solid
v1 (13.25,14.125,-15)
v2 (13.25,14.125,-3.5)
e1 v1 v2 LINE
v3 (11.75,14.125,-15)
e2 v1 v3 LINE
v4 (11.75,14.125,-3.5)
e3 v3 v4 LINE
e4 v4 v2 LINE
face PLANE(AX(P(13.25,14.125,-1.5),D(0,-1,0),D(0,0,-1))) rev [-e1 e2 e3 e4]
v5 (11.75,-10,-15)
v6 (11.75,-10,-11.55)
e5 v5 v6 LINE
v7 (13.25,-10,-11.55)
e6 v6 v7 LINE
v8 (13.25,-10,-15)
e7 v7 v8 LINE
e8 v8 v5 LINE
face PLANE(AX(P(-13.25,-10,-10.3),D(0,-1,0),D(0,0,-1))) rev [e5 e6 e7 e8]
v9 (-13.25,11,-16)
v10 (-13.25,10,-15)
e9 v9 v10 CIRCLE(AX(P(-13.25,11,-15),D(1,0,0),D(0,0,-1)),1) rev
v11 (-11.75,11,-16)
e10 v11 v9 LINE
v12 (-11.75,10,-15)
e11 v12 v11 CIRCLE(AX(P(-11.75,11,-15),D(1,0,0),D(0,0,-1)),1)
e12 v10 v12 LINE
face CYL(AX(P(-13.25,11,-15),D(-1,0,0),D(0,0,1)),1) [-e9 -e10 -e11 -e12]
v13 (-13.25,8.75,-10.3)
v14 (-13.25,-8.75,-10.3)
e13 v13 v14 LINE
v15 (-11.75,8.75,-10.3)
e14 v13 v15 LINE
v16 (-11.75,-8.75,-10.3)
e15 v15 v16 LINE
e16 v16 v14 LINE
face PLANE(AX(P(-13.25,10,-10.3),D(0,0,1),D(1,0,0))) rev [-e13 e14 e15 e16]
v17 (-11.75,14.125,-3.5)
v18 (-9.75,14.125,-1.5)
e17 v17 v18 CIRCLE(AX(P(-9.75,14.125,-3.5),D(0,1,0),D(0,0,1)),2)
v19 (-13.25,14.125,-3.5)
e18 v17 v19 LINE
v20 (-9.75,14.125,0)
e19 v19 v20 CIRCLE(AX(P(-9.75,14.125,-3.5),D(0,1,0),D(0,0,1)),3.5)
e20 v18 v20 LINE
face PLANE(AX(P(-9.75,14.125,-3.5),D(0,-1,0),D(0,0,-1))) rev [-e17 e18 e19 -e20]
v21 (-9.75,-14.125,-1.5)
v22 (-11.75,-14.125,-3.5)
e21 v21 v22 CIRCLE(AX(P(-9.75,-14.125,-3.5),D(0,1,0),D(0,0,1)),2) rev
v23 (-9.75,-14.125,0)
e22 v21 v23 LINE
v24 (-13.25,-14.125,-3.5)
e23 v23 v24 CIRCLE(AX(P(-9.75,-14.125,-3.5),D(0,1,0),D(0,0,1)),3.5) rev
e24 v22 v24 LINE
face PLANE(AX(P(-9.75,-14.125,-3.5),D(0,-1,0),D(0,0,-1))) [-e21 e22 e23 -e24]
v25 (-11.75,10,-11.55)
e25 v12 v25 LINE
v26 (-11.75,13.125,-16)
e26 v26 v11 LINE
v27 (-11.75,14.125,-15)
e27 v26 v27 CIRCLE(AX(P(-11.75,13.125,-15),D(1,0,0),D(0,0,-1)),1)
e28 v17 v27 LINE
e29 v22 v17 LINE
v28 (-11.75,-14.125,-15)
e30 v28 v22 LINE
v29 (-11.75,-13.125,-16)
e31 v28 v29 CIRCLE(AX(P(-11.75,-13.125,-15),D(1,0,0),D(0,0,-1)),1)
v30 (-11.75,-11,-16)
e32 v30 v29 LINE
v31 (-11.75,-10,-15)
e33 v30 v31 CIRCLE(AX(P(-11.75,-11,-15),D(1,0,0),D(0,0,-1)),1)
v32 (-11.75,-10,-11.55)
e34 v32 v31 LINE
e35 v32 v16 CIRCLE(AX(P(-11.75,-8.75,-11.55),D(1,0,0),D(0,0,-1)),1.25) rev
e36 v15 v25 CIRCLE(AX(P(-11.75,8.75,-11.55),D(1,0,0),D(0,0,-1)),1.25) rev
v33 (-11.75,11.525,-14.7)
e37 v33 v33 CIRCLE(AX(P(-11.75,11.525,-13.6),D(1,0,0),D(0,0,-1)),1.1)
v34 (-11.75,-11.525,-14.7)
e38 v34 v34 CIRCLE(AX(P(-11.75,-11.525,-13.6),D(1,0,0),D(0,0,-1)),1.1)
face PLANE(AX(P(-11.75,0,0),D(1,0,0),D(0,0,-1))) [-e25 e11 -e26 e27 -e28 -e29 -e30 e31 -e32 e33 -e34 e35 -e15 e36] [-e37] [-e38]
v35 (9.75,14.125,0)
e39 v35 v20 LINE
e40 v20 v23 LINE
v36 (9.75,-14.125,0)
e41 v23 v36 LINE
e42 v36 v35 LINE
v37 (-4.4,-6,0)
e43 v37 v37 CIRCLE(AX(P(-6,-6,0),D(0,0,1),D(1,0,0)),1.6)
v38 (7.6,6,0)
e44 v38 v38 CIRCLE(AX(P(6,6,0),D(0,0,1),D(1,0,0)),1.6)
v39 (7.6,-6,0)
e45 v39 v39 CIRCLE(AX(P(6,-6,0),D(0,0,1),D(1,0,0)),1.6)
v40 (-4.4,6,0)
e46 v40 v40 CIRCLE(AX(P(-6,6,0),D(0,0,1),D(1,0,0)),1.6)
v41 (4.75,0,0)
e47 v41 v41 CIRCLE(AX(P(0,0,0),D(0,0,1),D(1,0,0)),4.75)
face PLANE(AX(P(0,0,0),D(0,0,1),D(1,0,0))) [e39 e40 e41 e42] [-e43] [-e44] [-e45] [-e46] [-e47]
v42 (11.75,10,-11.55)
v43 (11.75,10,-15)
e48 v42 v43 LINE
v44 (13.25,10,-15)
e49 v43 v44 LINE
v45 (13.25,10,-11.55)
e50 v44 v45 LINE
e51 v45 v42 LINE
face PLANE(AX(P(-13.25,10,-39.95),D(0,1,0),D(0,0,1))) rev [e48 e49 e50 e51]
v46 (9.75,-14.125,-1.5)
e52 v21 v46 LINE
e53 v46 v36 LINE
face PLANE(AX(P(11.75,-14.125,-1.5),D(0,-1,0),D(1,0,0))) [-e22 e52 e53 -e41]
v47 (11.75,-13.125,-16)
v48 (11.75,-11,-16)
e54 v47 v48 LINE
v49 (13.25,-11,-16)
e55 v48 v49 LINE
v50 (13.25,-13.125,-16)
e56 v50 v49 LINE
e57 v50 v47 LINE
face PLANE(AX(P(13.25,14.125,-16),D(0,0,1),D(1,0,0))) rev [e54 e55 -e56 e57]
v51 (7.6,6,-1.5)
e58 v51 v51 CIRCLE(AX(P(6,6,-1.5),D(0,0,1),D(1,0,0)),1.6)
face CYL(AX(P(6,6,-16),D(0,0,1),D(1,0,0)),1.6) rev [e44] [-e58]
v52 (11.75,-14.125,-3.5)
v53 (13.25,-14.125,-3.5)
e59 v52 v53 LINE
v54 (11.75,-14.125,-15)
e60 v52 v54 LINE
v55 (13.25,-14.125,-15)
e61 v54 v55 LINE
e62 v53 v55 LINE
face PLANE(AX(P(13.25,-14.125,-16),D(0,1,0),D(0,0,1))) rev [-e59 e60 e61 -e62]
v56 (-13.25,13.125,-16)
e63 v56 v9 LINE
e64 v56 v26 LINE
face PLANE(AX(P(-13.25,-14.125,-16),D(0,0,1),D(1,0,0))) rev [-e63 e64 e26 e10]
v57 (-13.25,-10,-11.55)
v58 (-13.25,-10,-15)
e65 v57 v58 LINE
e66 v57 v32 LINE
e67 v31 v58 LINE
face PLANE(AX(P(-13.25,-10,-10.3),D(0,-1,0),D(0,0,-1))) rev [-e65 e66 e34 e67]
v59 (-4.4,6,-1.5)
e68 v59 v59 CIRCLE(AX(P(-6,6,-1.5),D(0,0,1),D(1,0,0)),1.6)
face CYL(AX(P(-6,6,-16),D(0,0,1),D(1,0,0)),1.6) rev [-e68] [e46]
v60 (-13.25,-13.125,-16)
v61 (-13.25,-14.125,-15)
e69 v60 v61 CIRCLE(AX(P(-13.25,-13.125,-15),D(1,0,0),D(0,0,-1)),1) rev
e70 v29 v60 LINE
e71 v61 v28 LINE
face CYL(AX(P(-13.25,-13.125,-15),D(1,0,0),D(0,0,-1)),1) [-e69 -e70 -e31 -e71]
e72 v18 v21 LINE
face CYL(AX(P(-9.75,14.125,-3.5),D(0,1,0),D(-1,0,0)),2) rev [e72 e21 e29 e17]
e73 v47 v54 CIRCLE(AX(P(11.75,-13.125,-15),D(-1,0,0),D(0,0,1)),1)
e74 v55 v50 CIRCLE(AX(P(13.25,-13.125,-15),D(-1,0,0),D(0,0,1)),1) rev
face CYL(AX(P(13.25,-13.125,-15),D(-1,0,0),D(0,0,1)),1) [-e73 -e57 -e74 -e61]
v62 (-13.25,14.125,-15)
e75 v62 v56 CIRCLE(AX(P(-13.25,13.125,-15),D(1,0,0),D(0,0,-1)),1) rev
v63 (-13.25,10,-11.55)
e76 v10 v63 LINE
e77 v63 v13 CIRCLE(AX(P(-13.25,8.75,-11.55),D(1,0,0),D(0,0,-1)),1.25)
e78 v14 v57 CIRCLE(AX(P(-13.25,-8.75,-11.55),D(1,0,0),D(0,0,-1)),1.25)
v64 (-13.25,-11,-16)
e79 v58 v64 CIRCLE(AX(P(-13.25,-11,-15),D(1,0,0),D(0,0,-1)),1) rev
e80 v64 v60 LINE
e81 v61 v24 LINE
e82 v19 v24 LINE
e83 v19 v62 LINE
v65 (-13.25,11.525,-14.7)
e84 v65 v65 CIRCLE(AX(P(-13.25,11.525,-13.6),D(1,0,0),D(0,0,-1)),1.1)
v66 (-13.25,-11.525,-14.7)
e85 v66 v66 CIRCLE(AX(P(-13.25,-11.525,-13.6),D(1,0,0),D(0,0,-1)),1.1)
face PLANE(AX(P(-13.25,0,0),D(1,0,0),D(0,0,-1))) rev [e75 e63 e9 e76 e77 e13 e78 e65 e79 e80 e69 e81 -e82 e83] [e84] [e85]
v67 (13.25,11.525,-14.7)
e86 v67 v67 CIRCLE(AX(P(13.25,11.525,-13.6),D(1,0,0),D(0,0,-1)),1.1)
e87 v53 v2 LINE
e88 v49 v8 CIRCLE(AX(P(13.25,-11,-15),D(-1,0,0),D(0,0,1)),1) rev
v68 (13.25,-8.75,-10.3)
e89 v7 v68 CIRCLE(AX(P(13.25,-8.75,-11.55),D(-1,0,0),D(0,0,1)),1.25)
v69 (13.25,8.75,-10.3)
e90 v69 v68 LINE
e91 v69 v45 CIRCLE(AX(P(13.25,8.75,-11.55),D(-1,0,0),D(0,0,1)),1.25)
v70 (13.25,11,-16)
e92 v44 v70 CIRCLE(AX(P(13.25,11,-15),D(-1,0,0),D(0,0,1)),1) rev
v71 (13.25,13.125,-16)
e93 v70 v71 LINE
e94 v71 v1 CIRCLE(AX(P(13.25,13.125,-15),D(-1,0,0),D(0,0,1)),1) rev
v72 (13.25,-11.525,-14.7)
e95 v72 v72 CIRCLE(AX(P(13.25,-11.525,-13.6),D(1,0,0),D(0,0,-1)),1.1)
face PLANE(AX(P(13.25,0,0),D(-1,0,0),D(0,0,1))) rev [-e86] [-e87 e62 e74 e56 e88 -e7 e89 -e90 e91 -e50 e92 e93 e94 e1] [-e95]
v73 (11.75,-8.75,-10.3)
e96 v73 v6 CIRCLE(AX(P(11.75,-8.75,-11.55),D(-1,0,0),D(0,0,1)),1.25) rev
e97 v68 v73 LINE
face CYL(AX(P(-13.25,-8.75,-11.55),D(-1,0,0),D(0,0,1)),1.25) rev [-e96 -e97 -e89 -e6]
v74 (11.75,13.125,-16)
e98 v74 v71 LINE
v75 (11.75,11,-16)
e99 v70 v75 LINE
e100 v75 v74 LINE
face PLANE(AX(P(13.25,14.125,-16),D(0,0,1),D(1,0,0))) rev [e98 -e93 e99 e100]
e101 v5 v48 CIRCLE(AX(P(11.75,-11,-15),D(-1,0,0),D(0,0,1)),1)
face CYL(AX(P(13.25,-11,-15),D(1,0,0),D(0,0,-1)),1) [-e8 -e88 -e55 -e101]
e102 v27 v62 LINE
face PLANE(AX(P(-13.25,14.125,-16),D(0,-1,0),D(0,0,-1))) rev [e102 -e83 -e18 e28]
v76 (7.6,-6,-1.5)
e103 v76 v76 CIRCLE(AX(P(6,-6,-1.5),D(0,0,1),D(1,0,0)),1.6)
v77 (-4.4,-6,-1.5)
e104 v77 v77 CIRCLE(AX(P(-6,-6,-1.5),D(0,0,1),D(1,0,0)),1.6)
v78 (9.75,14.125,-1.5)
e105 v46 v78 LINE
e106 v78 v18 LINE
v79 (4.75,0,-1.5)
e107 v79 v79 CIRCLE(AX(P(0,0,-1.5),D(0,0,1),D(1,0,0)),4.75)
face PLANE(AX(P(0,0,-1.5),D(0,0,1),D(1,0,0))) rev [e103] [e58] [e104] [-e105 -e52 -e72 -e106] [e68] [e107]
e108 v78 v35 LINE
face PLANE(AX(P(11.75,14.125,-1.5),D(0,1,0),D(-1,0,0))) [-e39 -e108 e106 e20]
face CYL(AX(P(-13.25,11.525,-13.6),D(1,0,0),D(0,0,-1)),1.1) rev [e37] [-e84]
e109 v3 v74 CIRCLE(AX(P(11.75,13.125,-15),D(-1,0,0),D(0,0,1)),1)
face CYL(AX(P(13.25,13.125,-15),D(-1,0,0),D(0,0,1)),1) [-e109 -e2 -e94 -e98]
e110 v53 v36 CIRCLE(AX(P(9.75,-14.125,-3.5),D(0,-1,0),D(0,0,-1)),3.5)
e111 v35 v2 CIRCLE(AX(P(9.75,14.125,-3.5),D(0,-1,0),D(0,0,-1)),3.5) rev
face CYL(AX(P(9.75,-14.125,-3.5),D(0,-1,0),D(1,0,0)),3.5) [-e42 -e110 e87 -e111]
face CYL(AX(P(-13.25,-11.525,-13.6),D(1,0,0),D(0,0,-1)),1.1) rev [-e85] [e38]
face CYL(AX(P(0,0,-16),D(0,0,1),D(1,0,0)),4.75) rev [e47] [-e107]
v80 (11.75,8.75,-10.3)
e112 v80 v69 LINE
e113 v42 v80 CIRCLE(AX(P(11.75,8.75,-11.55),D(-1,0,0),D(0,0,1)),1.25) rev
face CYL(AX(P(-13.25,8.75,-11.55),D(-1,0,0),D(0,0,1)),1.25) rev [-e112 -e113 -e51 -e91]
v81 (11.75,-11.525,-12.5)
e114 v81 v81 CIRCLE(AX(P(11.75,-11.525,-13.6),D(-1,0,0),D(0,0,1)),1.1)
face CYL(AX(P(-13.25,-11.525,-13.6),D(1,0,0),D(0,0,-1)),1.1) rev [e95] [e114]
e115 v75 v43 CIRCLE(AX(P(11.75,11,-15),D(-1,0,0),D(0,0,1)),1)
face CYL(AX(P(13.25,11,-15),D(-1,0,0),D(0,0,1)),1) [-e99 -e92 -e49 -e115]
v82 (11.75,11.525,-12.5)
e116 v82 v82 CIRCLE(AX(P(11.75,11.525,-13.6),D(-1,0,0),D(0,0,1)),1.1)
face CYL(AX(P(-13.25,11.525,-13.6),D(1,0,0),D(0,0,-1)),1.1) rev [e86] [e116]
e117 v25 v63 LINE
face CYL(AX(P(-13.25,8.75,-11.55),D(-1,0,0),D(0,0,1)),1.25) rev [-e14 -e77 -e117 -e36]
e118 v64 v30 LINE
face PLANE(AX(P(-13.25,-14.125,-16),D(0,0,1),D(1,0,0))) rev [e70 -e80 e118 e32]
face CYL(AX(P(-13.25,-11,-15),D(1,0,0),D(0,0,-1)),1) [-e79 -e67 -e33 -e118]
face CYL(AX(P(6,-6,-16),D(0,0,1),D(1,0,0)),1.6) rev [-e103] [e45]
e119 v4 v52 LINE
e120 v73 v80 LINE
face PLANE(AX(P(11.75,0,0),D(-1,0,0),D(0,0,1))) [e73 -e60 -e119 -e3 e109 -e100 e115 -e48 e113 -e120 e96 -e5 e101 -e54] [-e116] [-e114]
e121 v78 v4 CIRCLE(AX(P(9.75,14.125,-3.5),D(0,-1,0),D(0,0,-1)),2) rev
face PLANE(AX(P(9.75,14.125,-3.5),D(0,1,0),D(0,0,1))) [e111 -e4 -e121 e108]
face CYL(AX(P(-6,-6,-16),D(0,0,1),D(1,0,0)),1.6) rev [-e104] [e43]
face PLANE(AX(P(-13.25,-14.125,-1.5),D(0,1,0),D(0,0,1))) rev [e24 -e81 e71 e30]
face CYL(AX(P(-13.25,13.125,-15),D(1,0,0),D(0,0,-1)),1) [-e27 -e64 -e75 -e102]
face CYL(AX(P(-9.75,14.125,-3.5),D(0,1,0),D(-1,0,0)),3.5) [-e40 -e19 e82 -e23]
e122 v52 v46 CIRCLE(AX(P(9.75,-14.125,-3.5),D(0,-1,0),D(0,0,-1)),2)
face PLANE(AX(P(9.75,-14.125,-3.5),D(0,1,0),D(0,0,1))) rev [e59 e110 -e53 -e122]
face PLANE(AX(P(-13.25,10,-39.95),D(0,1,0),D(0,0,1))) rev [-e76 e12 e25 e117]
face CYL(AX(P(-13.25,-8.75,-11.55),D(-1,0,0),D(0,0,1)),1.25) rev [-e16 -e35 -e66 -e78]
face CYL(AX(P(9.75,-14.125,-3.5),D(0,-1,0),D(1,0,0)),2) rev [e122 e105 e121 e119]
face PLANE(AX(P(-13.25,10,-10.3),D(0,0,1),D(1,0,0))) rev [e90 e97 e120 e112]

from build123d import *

# Parameters (mm, degrees)
SKETCH1_W                      = 23.5
SKETCH1_H                      = 28.25
BASE_FLANGE1_DEPTH             = 1.5
EDGE_FLANGE1_STRIP_W           = 10
EDGE_FLANGE1_STRIP_H           = 1.5
EDGE_FLANGE1_STRIP_CUT_DEPTH   = 28.25
EDGE_FLANGE1_STRIP_2_W         = 10
EDGE_FLANGE1_STRIP_2_H         = 1.5
EDGE_FLANGE1_STRIP_CUT_2_DEPTH = 28.25
EDGE_FLANGE1_DEPTH             = 28.25
EDGE_FLANGE1_BEND_DEPTH        = 28.25
SKETCH12_R                     = 1.6
SKETCH12_R_2                   = 4.75
CUT_EXTRUDE1_DEPTH             = 26.12126838
SKETCH13_R                     = 1.1
SKETCH13_W                     = 29.65
SKETCH13_H                     = 20
CUT_EXTRUDE2_DEPTH             = 35.025955167
FILLET1_R                      = 1.25
FILLET2_R                      = 1


# Sheet-metal steps are written as plain solids
with BuildPart() as part:
    # Sketch1 → Base-Flange1 (new body)
    with BuildSketch(Plane.XY):
        Rectangle(SKETCH1_W, SKETCH1_H)
    extrude(amount=-BASE_FLANGE1_DEPTH)

    # Edge-Flange1 strip (across the edge) → Edge-Flange1 strip cut (cut)
    with BuildSketch(Plane(origin=(11.75, 14.125, -1.5), x_dir=(-1, 0, 0), z_dir=(0, -1, 0))):
        with Locations((-3, -0.75)):
            Rectangle(EDGE_FLANGE1_STRIP_W, EDGE_FLANGE1_STRIP_H)
    extrude(amount=EDGE_FLANGE1_STRIP_CUT_DEPTH, mode=Mode.SUBTRACT)

    # Edge-Flange1 strip 2 (across the edge) → Edge-Flange1 strip cut 2 (cut)
    with BuildSketch(Plane(origin=(-11.75, -14.125, -1.5), x_dir=(1, 0, 0), z_dir=(0, 1, 0))):
        with Locations((-3, -0.75)):
            Rectangle(EDGE_FLANGE1_STRIP_2_W, EDGE_FLANGE1_STRIP_2_H)
    extrude(amount=EDGE_FLANGE1_STRIP_CUT_2_DEPTH, mode=Mode.SUBTRACT)

    # Edge-Flange1 section (across the edge) → Edge-Flange1 (add)
    with BuildSketch(Plane(origin=(11.75, 14.125, -1.5), x_dir=(-1, 0, 0), z_dir=(0, -1, 0))):
        with BuildLine():
            Line((-1.5, 2), (-1.5, 14.5))
            Line((-1.5, 14.5), (0, 14.5))
            Line((0, 14.5), (0, 2))
            ThreePointArc((0, 2), (0.585786438, 0.585786438), (2, 0))
            Line((2, 0), (2, -1.5))
            ThreePointArc((2, -1.5), (-0.474873734, -0.474873734), (-1.5, 2))
        make_face()
    extrude(amount=EDGE_FLANGE1_DEPTH)

    # Edge-Flange1 section 2 (across the edge) → Edge-Flange1 bend (add)
    with BuildSketch(Plane(origin=(-11.75, -14.125, -1.5), x_dir=(1, 0, 0), z_dir=(0, 1, 0))):
        with BuildLine():
            Line((-1.5, 2), (-1.5, 14.5))
            Line((-1.5, 14.5), (0, 14.5))
            Line((0, 14.5), (0, 2))
            ThreePointArc((0, 2), (0.585786438, 0.585786438), (2, 0))
            Line((2, 0), (2, -1.5))
            ThreePointArc((2, -1.5), (-0.474873734, -0.474873734), (-1.5, 2))
        make_face()
    extrude(amount=EDGE_FLANGE1_BEND_DEPTH)

    # Sketch12 → Cut-Extrude1 (cut, through all)
    with BuildSketch(Plane.XY):
        with Locations((-6, 6)):
            Circle(SKETCH12_R)
        with Locations((6, 6)):
            Circle(SKETCH12_R)
        with Locations((6, -6)):
            Circle(SKETCH12_R)
        with Locations((-6, -6)):
            Circle(SKETCH12_R)
        Circle(SKETCH12_R_2)
    extrude(amount=-CUT_EXTRUDE1_DEPTH, mode=Mode.SUBTRACT)

    # Sketch13 → Cut-Extrude2 (cut, through all)
    with BuildSketch(Plane(origin=(13.25, 0, 0), x_dir=(0, 0, -1), z_dir=(1, 0, 0))):
        with Locations((13.6, 11.525)):
            Circle(SKETCH13_R)
        with Locations((13.6, -11.525)):
            Circle(SKETCH13_R)
        with Locations((25.125, 0)):
            Rectangle(SKETCH13_W, SKETCH13_H)
    extrude(amount=-CUT_EXTRUDE2_DEPTH, mode=Mode.SUBTRACT)

    # Fillet1
    fillet1_edges = [part.edges().sort_by_distance(p)[0] for p in [
        (12.5, -10, -10.3),
        (12.5, 10, -10.3),
        (-12.5, -10, -10.3),
        (-12.5, 10, -10.3),
    ]]
    fillet(fillet1_edges, radius=FILLET1_R)

    # Fillet2
    fillet2_edges = [part.edges().sort_by_distance(p)[0] for p in [
        (-12.5, 10, -16),
        (-12.5, -10, -16),
        (12.5, -10, -16),
        (12.5, 10, -16),
        (12.5, 14.125, -16),
        (12.5, -14.125, -16),
        (-12.5, -14.125, -16),
        (-12.5, 14.125, -16),
    ]]
    fillet(fillet2_edges, radius=FILLET2_R)


solid = part.part
